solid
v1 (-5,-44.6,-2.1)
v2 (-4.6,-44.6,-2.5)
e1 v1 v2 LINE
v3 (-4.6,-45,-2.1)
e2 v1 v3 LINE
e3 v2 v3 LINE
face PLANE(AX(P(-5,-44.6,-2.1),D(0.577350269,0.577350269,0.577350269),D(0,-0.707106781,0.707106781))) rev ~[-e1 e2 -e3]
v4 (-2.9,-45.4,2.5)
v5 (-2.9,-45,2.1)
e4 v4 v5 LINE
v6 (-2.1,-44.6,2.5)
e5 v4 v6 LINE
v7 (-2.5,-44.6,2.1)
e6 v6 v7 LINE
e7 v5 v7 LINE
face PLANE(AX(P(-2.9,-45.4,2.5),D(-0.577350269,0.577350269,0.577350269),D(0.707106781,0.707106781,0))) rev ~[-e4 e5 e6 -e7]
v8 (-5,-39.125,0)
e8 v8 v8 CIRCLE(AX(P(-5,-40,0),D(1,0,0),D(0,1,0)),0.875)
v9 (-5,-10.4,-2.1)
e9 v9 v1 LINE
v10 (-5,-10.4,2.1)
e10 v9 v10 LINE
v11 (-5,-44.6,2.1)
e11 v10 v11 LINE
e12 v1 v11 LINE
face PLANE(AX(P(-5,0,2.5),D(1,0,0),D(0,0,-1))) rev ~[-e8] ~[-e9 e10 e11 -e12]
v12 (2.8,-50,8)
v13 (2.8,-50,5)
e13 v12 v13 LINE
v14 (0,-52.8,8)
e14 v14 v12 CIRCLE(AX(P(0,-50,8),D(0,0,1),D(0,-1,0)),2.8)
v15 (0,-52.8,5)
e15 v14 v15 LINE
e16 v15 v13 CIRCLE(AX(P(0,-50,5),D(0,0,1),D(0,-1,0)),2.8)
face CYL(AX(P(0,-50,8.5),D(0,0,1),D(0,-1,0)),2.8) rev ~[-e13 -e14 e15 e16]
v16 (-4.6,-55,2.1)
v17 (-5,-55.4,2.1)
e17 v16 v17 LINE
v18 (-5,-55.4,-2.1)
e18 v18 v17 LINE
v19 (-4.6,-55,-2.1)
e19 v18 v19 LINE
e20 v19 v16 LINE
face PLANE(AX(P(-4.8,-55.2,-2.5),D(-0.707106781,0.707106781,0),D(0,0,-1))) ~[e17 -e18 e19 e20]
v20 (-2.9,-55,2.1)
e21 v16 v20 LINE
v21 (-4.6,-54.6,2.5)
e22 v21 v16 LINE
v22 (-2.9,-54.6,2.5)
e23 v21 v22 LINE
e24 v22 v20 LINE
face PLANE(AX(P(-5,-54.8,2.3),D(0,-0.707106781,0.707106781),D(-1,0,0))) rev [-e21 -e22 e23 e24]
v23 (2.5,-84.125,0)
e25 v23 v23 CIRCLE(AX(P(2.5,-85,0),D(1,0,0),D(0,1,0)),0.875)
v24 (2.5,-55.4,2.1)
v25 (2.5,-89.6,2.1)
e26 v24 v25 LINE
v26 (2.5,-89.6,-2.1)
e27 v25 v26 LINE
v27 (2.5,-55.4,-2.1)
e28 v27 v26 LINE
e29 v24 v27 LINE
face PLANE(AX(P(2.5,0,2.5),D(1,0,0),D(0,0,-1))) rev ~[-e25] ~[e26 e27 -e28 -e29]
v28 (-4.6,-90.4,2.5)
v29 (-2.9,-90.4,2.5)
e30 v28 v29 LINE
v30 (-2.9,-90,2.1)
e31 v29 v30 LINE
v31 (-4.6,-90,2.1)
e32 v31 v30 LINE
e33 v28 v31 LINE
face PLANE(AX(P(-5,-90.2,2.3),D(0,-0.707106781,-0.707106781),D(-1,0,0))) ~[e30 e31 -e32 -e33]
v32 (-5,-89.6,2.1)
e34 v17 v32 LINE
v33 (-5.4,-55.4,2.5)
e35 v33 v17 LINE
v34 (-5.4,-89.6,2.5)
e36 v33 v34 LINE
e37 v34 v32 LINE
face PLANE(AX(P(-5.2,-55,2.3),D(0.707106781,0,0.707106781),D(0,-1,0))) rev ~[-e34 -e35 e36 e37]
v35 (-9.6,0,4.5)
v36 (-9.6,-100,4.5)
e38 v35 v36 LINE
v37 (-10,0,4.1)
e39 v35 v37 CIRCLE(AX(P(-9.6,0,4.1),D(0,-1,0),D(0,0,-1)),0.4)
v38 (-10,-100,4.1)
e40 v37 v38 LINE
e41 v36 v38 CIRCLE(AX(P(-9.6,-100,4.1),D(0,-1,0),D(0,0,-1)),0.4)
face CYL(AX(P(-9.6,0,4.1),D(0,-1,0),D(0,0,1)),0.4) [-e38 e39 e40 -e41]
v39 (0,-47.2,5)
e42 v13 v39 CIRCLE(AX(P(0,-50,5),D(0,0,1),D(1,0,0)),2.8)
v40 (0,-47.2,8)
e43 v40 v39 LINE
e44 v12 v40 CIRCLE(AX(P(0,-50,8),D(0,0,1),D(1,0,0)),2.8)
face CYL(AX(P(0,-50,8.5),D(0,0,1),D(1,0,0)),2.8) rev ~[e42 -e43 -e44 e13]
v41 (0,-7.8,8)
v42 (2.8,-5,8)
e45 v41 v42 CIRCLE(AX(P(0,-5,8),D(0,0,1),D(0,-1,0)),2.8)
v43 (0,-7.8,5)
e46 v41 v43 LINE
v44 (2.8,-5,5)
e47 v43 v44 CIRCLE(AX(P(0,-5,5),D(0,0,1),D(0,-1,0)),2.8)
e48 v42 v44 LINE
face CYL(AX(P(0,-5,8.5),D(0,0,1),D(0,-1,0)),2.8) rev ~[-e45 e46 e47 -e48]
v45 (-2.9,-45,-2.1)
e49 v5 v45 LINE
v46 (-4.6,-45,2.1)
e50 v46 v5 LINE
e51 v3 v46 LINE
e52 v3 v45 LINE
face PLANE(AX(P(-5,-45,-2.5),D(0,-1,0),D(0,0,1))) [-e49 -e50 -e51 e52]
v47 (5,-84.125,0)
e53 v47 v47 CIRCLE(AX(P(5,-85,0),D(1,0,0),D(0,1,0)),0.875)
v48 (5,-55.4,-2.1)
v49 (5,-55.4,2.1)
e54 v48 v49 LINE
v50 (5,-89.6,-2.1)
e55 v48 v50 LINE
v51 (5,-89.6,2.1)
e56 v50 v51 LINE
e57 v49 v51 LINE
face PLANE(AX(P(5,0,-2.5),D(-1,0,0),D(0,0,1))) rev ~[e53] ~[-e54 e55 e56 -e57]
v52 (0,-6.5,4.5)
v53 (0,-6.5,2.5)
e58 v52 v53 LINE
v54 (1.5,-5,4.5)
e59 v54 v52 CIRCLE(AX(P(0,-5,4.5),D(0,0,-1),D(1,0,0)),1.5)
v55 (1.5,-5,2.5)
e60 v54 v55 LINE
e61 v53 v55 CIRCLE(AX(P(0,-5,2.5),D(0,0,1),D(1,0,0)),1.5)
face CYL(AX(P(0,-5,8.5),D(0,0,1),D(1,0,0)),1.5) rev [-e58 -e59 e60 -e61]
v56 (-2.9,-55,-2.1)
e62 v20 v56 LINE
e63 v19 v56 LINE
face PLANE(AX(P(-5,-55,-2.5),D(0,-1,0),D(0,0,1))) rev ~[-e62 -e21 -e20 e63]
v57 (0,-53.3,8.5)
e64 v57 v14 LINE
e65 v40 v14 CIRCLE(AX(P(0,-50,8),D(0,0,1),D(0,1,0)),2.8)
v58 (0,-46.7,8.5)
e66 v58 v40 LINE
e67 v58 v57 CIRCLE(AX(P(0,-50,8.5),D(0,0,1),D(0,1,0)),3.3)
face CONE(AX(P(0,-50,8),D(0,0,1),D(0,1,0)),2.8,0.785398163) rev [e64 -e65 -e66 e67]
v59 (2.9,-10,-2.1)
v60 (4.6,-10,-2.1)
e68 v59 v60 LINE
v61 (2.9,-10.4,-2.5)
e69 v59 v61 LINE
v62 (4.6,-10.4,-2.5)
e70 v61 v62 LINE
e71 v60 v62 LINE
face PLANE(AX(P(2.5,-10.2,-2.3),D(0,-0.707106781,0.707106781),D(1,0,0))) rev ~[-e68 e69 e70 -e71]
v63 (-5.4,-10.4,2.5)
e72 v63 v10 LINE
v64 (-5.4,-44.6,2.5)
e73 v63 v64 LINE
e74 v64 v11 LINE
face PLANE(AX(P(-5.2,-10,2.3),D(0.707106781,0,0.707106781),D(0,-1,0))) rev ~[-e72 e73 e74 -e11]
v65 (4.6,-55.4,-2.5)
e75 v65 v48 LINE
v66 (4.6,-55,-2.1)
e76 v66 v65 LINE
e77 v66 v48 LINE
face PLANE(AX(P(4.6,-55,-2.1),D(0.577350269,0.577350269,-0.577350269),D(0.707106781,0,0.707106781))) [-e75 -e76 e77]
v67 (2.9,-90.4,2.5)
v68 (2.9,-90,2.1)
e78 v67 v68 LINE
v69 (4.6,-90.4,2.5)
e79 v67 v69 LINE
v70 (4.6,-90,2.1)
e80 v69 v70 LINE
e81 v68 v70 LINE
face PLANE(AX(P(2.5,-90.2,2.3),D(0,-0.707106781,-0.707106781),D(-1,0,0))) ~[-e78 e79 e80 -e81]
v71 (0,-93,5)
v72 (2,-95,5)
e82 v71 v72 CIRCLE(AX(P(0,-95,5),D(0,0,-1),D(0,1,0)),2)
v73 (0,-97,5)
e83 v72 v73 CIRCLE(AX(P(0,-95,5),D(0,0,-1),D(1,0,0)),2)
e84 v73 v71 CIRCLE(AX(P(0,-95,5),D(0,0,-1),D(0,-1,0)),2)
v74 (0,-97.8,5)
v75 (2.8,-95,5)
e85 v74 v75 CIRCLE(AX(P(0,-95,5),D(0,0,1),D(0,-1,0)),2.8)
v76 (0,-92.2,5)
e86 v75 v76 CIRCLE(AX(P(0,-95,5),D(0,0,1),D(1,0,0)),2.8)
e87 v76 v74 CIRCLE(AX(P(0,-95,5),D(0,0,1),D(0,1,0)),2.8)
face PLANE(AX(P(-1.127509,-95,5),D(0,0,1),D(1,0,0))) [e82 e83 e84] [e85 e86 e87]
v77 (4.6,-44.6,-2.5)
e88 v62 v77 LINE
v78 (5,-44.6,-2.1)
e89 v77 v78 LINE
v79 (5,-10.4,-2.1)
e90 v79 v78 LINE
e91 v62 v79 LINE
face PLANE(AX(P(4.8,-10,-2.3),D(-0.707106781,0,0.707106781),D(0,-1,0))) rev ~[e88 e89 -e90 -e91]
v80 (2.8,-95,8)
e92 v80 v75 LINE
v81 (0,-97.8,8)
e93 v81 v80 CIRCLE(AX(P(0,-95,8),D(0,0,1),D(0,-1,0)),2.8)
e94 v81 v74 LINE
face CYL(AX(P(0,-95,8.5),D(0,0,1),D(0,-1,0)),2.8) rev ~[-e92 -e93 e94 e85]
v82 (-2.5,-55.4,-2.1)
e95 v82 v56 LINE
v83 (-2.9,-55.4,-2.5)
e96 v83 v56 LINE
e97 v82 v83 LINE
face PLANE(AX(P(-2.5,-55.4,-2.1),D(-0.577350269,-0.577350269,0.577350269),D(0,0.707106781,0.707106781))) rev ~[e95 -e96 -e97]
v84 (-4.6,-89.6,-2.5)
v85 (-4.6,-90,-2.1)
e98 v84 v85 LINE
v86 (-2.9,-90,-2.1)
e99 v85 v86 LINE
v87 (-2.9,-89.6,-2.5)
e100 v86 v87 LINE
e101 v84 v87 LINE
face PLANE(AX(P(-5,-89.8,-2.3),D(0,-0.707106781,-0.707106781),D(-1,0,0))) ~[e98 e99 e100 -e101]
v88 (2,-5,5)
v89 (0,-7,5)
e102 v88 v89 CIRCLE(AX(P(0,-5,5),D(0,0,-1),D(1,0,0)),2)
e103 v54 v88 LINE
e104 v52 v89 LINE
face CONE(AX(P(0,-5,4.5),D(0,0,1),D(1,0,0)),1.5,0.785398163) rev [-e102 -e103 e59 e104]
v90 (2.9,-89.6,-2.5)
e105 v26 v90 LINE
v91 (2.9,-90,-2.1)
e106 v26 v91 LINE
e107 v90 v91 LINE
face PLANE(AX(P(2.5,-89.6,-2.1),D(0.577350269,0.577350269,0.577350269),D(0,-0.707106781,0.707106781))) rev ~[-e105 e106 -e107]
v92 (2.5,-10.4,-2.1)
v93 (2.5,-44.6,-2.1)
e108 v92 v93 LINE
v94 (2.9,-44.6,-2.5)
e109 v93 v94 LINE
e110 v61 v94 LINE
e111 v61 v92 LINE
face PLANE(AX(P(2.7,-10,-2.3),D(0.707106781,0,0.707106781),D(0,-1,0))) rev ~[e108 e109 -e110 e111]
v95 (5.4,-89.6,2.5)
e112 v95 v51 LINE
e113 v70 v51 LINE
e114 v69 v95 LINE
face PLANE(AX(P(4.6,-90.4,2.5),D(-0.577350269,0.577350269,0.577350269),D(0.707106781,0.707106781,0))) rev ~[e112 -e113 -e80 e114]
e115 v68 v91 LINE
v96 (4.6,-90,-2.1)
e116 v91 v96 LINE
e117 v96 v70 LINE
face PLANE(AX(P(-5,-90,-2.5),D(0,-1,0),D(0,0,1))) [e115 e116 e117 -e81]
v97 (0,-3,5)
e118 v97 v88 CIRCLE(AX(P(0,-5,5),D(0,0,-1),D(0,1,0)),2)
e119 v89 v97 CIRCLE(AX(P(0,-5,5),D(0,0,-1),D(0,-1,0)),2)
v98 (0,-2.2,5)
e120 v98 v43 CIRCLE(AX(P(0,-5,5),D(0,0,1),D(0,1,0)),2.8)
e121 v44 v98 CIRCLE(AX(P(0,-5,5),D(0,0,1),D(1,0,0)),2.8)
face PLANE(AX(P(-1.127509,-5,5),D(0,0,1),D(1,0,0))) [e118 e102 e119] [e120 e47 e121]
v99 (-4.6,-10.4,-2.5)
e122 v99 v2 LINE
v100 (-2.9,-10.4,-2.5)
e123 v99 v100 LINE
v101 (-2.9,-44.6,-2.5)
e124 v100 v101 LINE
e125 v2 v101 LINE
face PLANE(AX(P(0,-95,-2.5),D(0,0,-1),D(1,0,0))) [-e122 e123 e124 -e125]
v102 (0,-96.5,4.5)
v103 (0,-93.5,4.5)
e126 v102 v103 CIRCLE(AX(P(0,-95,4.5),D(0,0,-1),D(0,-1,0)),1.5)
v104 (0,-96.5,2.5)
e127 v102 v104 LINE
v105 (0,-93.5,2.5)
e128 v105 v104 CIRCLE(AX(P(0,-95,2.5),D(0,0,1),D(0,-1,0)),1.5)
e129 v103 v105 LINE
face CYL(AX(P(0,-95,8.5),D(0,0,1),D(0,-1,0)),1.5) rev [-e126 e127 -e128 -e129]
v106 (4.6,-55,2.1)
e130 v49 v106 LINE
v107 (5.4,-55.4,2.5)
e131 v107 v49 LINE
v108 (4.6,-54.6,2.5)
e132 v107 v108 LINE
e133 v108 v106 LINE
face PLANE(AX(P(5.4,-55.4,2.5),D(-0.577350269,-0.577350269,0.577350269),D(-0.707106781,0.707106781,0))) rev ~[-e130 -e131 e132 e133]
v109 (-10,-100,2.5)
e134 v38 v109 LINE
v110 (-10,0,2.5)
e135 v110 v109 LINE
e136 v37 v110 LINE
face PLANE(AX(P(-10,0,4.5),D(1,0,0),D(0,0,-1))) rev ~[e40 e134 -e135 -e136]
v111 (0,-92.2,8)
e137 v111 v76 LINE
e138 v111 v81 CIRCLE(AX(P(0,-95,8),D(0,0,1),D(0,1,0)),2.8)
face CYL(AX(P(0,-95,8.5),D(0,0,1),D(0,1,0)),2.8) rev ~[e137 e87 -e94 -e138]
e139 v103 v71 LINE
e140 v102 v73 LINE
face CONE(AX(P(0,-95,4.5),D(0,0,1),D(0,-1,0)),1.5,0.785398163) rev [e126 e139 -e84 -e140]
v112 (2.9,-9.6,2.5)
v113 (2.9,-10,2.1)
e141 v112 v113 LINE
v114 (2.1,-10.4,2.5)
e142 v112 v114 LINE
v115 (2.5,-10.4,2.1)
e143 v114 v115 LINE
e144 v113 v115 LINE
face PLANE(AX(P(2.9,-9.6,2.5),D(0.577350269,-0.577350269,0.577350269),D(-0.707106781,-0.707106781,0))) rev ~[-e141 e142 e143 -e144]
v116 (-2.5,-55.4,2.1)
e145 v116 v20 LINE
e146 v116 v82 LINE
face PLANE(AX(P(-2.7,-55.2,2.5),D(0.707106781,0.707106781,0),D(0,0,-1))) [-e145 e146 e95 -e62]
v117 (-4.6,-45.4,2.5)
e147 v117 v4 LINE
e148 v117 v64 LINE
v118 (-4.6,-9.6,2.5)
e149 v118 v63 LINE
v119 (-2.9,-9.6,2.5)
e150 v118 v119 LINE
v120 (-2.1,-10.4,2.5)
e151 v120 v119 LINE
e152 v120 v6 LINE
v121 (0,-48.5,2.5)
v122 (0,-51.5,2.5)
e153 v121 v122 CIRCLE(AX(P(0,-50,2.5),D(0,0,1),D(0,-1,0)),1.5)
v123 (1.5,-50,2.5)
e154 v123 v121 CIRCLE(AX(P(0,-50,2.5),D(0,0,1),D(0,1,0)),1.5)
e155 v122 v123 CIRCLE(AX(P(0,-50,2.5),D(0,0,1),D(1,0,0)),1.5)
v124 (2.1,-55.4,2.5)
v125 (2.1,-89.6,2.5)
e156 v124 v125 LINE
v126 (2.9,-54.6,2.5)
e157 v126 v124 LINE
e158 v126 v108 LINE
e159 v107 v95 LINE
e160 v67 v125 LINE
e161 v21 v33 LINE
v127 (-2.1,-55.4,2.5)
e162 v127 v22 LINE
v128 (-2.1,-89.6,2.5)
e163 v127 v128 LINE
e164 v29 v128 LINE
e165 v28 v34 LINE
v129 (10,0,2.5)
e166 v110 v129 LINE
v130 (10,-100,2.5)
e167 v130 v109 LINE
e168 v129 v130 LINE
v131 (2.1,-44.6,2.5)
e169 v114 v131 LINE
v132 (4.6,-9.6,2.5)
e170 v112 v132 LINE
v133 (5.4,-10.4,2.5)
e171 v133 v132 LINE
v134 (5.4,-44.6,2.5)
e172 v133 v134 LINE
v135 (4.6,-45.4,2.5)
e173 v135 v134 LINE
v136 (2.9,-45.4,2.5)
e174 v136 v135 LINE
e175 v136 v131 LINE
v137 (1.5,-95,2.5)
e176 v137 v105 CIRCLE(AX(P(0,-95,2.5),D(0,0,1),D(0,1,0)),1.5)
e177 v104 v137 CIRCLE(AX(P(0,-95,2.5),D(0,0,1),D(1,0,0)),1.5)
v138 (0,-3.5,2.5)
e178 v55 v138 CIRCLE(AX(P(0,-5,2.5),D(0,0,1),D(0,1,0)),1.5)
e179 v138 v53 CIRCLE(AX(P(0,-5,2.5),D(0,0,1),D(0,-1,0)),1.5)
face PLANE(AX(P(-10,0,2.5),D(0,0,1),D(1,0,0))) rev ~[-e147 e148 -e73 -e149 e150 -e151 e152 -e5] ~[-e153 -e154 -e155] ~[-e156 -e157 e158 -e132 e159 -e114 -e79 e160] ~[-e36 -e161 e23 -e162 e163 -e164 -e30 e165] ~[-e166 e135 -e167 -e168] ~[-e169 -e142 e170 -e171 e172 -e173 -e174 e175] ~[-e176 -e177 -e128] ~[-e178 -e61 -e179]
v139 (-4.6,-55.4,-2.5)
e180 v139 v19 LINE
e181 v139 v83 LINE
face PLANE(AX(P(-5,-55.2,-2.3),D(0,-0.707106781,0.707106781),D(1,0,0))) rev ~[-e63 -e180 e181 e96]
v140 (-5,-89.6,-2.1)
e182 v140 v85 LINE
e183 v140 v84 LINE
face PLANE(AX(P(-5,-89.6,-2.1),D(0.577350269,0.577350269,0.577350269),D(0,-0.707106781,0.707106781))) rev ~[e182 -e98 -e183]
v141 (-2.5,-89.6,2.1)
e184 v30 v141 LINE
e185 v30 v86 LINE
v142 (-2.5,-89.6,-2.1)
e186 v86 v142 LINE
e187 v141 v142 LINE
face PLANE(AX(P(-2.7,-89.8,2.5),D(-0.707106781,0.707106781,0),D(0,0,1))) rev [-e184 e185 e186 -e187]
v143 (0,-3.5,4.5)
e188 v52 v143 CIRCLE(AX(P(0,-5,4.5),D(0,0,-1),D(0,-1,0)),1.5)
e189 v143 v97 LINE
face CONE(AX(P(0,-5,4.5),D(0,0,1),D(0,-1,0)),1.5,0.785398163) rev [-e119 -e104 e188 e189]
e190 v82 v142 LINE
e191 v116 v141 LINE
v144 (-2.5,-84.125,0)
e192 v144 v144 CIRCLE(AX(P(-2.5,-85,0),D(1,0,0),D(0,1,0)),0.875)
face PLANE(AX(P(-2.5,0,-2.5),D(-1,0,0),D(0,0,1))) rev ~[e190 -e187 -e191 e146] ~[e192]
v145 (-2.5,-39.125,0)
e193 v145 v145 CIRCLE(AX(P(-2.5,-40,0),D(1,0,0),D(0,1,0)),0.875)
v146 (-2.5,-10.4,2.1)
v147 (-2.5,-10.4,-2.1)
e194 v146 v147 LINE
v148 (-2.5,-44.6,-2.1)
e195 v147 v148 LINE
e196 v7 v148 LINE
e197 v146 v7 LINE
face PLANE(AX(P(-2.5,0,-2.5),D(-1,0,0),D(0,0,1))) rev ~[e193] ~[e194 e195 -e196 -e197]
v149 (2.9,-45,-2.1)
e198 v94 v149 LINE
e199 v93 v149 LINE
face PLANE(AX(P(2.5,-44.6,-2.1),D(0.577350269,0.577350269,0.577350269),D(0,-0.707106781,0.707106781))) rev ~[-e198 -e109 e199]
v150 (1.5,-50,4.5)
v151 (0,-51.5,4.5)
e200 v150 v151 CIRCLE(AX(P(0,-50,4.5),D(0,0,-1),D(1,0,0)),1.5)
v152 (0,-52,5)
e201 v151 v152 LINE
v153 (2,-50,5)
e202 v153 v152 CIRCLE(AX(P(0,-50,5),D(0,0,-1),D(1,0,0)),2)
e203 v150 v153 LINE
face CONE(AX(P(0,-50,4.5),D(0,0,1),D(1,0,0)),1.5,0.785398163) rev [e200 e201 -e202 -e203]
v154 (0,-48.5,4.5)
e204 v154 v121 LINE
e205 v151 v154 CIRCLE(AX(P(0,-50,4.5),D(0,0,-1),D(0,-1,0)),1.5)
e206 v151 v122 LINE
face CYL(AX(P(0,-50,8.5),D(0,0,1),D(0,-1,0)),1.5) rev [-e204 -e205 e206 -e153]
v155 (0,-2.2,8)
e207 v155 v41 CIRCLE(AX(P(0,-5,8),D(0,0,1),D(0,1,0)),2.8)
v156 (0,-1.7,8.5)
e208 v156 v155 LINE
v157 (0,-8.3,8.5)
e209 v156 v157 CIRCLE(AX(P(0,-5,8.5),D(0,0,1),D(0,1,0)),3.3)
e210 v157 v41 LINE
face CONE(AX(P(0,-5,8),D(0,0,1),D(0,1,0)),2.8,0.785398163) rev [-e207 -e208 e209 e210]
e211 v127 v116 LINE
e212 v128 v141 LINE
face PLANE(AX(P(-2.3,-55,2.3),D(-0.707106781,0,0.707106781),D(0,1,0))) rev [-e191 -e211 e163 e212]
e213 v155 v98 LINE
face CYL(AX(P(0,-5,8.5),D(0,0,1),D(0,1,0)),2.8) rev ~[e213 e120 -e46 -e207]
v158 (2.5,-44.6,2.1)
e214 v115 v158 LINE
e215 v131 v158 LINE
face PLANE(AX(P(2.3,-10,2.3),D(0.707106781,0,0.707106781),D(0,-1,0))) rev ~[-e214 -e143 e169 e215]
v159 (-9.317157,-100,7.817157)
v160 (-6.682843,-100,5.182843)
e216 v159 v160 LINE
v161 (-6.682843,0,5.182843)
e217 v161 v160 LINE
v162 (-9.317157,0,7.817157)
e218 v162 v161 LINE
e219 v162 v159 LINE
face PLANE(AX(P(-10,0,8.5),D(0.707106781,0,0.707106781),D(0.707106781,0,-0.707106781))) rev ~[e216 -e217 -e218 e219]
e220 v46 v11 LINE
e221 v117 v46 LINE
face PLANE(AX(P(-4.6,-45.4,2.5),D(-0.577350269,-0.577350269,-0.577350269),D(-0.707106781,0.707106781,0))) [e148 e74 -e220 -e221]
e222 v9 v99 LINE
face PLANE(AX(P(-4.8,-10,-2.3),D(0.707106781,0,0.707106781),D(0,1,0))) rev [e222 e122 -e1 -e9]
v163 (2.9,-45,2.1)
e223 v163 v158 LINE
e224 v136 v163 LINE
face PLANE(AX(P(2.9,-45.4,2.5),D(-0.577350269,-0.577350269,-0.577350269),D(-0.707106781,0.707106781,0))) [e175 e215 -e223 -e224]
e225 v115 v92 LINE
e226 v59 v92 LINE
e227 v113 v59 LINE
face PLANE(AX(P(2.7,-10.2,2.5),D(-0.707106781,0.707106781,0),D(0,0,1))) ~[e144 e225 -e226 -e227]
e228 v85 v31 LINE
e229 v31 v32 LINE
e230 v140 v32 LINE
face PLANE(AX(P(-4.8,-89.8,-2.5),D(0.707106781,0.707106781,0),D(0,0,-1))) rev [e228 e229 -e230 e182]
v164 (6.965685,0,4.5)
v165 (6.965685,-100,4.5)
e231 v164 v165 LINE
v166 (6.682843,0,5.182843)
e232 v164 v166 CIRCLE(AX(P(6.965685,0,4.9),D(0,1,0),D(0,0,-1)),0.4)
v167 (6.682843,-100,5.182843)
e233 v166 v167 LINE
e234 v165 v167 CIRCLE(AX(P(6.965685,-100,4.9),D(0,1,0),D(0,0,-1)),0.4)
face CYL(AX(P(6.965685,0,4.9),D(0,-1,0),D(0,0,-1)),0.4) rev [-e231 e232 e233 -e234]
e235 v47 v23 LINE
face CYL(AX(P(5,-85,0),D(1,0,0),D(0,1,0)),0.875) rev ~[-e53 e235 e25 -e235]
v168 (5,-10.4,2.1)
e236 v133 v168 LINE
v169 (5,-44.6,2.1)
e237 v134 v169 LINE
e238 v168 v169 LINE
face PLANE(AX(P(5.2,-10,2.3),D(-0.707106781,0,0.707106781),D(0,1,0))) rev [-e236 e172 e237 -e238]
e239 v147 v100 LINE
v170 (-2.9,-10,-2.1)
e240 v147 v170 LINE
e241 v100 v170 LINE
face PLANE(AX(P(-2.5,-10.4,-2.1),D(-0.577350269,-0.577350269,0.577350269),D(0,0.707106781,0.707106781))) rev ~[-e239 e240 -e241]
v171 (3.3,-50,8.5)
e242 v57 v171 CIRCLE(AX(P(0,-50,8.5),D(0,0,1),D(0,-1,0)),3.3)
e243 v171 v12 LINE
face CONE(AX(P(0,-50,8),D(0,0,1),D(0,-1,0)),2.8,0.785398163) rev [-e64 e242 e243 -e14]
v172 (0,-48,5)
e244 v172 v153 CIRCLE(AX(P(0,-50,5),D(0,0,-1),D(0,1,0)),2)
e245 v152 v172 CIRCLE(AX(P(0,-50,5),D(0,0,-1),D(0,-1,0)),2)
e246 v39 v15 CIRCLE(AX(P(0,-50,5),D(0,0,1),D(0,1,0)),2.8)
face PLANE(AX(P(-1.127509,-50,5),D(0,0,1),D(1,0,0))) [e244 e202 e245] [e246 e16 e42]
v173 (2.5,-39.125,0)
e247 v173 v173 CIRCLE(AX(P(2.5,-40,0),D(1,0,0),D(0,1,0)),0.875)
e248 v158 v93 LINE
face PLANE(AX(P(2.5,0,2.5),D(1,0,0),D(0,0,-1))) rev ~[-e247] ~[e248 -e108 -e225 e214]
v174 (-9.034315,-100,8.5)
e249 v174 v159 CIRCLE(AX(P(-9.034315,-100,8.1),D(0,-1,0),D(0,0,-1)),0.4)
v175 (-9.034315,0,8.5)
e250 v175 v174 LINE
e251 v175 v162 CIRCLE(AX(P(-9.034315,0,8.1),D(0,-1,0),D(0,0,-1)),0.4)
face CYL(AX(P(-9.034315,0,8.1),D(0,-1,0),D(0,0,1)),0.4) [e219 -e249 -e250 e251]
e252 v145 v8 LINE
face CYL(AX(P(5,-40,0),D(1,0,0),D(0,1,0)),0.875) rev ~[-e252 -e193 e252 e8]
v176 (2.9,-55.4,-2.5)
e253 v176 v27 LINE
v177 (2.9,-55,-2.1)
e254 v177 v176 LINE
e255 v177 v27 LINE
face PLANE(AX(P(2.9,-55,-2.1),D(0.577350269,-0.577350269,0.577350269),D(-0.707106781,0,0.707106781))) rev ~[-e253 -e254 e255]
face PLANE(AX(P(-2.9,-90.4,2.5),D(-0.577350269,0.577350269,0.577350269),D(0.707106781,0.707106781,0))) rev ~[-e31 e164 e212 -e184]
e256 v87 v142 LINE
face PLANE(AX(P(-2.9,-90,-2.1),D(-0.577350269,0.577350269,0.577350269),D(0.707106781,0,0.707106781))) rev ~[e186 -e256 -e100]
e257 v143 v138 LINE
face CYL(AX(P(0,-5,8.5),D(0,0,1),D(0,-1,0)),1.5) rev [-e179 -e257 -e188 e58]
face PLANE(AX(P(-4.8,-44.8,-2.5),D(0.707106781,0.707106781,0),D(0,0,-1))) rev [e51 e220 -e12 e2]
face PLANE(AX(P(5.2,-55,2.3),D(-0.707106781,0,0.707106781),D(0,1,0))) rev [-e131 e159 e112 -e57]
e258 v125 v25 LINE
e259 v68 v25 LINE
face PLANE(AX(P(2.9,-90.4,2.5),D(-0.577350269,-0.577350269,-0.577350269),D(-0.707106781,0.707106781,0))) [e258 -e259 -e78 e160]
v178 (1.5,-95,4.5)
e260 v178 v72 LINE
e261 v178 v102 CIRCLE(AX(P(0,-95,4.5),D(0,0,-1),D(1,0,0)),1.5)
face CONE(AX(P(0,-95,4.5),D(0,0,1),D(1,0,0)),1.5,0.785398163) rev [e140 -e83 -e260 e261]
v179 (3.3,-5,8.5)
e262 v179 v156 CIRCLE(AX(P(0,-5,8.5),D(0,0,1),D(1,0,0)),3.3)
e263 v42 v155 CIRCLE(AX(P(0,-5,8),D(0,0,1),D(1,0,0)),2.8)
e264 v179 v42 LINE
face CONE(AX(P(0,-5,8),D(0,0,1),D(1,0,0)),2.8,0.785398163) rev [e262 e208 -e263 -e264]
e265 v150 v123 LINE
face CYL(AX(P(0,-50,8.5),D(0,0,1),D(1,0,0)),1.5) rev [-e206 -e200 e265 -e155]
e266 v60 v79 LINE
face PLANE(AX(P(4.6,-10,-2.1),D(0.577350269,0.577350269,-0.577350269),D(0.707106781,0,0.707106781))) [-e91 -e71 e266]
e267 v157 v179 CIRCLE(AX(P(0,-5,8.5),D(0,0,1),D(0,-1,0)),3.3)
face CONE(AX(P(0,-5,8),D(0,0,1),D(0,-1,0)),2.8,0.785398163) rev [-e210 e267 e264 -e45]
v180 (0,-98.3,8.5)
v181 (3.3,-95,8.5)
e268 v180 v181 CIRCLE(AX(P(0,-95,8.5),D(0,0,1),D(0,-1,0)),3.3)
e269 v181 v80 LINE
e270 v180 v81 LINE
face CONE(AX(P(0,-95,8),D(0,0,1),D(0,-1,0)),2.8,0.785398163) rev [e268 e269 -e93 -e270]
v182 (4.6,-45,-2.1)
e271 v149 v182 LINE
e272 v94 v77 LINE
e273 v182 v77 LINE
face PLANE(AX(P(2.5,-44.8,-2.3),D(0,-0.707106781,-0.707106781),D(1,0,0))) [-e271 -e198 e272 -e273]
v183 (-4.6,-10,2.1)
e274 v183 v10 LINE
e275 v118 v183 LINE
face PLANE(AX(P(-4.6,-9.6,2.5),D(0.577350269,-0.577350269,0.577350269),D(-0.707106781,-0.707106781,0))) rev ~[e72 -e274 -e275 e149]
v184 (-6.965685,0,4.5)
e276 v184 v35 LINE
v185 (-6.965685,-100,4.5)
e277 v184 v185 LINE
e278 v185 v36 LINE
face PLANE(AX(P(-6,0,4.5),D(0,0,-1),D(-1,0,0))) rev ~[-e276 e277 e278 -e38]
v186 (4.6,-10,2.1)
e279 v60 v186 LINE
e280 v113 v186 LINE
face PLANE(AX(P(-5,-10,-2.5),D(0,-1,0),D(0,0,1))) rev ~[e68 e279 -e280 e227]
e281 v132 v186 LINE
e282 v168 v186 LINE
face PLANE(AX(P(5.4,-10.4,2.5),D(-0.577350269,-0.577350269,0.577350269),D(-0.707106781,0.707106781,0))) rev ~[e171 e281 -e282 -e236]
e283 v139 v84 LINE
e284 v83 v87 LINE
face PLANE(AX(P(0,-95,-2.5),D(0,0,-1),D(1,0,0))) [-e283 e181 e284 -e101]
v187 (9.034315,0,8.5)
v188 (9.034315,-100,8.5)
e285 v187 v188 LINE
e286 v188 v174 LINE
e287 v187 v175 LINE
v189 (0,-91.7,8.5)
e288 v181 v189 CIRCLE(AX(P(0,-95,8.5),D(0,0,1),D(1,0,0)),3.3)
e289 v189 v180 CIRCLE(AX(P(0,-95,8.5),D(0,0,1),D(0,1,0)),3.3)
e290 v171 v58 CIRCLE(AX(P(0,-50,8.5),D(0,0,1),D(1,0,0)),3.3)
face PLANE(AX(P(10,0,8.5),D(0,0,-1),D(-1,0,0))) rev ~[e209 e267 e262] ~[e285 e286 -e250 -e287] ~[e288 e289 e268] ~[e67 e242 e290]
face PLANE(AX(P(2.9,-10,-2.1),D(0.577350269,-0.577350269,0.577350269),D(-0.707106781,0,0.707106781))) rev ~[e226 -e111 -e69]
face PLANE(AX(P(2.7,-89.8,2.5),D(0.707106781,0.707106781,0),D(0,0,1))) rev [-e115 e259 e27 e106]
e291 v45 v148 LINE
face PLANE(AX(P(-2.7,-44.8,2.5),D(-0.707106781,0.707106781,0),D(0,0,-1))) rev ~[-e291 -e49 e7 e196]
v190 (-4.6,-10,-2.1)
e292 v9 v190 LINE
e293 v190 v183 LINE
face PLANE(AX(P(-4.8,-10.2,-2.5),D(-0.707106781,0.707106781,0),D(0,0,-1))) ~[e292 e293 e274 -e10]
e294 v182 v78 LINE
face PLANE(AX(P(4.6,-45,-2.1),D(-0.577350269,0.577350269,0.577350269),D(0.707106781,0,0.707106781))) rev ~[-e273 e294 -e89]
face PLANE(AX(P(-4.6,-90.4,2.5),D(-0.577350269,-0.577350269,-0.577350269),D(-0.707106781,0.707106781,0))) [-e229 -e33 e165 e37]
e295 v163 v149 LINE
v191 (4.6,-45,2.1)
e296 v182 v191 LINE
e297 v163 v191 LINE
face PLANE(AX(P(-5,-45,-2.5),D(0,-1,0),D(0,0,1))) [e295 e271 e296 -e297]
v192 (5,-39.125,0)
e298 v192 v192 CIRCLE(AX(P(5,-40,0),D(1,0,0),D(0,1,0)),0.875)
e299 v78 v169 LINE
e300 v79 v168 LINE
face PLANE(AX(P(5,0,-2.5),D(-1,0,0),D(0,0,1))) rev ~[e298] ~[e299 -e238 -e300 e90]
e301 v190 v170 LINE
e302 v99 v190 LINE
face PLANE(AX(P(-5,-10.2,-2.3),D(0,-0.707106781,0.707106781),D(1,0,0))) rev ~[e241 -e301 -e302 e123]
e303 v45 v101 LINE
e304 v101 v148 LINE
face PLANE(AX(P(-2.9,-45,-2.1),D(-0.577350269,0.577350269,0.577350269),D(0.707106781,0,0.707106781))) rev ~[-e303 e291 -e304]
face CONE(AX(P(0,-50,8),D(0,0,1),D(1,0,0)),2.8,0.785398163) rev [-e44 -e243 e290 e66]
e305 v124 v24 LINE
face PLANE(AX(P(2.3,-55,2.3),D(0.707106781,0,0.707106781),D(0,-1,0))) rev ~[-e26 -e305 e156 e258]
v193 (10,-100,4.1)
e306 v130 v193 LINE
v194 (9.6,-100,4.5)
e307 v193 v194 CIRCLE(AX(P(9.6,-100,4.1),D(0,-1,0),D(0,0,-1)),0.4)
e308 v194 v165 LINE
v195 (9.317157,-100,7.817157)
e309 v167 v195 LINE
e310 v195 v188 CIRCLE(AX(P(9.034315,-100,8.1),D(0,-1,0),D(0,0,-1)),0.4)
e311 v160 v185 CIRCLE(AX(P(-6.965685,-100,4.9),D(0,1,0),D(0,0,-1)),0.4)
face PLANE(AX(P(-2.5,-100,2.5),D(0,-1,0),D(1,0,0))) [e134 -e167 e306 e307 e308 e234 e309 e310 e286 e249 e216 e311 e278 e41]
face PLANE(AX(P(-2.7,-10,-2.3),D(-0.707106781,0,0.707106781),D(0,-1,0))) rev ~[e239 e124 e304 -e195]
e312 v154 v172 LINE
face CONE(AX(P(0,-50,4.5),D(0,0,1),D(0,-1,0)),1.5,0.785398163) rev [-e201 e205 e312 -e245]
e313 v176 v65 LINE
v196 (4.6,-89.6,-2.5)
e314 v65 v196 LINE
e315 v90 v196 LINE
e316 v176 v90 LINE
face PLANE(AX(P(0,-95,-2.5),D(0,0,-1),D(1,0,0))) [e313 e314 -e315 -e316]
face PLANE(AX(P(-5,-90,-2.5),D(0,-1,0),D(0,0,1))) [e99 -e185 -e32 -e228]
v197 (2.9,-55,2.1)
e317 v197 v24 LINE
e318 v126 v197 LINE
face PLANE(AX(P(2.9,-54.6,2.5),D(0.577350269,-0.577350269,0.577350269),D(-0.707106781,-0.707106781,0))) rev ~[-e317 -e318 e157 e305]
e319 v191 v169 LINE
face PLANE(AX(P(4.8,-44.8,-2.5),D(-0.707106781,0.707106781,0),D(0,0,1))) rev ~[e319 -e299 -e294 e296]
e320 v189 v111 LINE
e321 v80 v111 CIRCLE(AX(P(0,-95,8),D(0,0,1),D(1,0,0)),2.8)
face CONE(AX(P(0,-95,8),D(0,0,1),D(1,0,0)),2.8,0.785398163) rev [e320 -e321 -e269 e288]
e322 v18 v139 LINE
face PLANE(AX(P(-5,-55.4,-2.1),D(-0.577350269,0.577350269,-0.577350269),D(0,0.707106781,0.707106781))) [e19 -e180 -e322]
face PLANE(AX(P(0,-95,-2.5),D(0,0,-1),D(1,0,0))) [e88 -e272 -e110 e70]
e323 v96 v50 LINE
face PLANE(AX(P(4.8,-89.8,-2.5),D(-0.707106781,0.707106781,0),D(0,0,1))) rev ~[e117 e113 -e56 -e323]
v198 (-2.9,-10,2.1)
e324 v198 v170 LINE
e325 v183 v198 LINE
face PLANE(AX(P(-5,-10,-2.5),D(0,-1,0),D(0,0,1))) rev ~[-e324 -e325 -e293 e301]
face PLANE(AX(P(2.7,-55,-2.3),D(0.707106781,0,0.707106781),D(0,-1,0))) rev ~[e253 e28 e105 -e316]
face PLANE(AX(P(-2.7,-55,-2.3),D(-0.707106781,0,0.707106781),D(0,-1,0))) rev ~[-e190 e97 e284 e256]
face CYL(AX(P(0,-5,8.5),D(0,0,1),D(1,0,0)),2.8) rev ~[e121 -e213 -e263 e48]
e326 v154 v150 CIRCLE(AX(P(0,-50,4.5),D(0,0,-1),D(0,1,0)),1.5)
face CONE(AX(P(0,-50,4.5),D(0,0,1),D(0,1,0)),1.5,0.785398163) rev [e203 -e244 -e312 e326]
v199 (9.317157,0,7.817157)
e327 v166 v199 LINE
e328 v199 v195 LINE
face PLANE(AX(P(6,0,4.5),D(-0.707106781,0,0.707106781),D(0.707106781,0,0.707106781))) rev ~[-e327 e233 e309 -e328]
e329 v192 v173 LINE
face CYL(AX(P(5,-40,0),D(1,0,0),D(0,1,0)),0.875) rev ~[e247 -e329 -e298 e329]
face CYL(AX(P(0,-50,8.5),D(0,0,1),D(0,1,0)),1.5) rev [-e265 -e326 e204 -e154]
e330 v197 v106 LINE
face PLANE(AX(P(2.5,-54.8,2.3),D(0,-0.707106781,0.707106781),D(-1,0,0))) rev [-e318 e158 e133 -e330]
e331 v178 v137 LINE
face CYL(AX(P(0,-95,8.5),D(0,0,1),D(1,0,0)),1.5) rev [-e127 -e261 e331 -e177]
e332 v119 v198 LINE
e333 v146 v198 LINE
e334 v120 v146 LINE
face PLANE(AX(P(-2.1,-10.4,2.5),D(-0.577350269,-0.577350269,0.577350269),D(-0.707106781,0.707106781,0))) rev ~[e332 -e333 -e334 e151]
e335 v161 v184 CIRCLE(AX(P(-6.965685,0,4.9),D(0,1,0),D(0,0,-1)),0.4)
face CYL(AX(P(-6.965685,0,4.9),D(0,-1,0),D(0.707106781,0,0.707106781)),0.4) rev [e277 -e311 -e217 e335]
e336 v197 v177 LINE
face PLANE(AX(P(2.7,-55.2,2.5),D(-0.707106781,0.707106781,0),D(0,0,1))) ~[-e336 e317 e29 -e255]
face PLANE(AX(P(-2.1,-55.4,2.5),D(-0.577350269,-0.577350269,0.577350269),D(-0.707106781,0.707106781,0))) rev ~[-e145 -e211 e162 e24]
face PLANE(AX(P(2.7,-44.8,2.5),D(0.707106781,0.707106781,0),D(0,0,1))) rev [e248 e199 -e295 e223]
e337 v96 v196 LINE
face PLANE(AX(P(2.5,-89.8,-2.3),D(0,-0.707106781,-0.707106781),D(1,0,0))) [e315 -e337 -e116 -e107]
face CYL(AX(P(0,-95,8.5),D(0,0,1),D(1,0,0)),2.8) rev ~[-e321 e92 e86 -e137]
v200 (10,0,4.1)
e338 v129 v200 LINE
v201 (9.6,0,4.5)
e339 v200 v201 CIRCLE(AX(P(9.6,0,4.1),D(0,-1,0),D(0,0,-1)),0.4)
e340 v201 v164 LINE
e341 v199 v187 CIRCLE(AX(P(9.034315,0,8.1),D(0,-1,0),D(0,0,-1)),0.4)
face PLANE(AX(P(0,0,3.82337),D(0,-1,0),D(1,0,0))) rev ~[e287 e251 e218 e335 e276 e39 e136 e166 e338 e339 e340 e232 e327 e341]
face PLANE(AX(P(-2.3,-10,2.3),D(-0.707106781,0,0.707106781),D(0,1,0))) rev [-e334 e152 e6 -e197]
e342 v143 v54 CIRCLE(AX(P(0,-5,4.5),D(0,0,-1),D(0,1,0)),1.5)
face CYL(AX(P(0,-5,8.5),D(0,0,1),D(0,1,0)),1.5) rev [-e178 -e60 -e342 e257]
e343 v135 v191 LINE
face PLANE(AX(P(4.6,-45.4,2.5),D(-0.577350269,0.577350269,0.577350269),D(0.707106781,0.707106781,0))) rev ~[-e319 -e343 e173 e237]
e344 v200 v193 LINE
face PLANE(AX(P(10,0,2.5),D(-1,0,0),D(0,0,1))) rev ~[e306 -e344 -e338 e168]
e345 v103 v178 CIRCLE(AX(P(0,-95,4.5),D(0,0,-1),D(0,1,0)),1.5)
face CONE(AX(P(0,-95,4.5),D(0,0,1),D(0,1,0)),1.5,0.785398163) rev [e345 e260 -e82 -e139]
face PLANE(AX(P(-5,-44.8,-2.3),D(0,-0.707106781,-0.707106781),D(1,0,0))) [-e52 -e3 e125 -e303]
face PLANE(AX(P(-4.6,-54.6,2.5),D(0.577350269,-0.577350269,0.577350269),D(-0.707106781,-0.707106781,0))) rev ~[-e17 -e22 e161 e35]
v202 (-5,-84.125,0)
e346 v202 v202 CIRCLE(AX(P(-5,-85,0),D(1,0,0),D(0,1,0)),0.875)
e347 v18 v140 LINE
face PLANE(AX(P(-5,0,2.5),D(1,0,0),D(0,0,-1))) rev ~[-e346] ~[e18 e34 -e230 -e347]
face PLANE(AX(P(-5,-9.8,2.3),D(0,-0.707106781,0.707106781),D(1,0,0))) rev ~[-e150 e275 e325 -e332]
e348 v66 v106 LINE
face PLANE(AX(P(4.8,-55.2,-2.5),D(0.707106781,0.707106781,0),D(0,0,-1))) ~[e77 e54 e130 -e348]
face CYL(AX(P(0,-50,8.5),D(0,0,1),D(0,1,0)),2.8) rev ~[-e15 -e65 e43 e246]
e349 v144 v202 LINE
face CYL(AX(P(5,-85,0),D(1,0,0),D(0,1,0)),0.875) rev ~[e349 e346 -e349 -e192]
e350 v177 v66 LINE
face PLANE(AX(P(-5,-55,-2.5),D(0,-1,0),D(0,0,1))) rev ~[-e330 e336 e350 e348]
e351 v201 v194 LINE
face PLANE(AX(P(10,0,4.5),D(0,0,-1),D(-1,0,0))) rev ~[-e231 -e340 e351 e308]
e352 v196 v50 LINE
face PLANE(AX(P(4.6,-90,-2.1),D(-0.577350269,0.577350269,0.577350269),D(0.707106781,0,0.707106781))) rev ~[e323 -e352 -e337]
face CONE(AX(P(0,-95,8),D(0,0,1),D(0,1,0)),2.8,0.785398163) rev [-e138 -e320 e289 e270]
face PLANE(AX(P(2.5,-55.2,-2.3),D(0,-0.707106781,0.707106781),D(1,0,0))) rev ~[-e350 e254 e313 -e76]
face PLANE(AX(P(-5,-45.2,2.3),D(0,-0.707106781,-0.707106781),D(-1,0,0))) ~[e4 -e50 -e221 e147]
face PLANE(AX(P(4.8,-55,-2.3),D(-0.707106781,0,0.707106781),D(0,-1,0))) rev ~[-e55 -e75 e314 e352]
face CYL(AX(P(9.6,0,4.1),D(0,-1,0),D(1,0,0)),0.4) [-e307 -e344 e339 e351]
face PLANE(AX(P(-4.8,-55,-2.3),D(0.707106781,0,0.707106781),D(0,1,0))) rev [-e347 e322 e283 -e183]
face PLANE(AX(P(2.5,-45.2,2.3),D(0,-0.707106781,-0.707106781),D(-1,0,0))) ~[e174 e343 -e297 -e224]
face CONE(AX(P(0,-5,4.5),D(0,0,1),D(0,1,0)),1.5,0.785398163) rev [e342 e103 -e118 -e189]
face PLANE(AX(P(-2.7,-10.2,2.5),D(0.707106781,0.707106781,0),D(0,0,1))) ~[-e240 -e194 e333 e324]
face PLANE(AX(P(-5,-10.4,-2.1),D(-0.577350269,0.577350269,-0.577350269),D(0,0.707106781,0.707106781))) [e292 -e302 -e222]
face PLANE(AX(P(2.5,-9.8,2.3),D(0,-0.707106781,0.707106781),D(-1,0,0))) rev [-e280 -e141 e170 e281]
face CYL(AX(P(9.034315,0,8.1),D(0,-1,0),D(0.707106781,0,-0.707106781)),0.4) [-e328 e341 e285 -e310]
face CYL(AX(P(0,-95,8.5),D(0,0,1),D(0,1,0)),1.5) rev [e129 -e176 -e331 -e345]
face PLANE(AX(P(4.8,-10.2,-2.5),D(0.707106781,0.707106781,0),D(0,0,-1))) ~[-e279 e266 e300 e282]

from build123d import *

# Parameters (mm, degrees)
F1_DEPTH  = 100
F2_W      = 5
F2_H      = 10
F3_DEPTH  = 5
F4_R      = 0.875
F5_DEPTH  = 25
F6_R      = 0.4
F8_DEPTH  = 3.5
F9_DEPTH  = 11.001
F10_SIZE  = 0.5
F11_W     = 10
F11_H     = 5
F12_DEPTH = 25
F13_SIZE  = 0.4


with BuildPart() as f1:
    # F0 (on Front) → F1 (new body)
    with BuildSketch(Plane.XZ):
        Polygon((2.5, -2.5), (5, -2.5), (5, 2.5), (10, 2.5), (10, 4.5), (6, 4.5), (10, 8.5), (6, 8.5), (-6, 8.5), (-10, 8.5), (-6, 4.5), (-10, 4.5), (-10, 2.5), (-5, 2.5), (-5, -2.5), (-2.5, -2.5), (-2.5, 2.5), (2.5, 2.5), align=None)
    extrude(amount=F1_DEPTH)

    # F2 (on face) → F3 (join)
    with BuildSketch(Plane(origin=(0, 0, 2.5), x_dir=(1, 0, 0), z_dir=(0, 0, -1))):
        with Locations((0, 95)):
            Rectangle(F2_W, F2_H)
        Polygon((-2.5, 50), (-2.5, 45), (2.5, 45), (2.5, 50), (2.5, 55), (-2.5, 55), align=None)
        with Locations((0, 5)):
            Rectangle(F2_W, F2_H)
    extrude(amount=F3_DEPTH)

    # F4 (on face) → F5 (cut)
    with BuildSketch(Plane.YZ.offset(5)):
        with Locations((-85, 0)):
            Circle(F4_R)
        with Locations((-40, 0)):
            Circle(F4_R)
    extrude(amount=-F5_DEPTH, mode=Mode.SUBTRACT)

    # F6
    f6_edges = [f1.edges().sort_by_distance(p)[0] for p in [
        (10, -50, 4.5),
        (-10, -50, 4.5),
        (-6, -50, 4.5),
        (6, -50, 4.5),
        (10, -50, 8.5),
        (-10, -50, 8.5),
    ]]
    fillet(f6_edges, radius=F6_R)

    # F7 (on face) → F8 (cut)
    with BuildSketch(Plane.XY.offset(8.5)):
        with BuildLine():
            ThreePointArc((0, -92.2), (-2.8, -95), (0, -97.8))
            Line((0, -97.8), (0, -96.5))
            ThreePointArc((0, -96.5), (-1.5, -95), (0, -93.5))
            Line((0, -93.5), (0, -92.2))
        make_face()
        with BuildLine():
            ThreePointArc((0, -2.2), (-2.8, -5), (0, -7.8))
            Line((0, -7.8), (0, -6.5))
            ThreePointArc((0, -6.5), (-1.5, -5), (0, -3.5))
            Line((0, -3.5), (0, -2.2))
        make_face()
        with BuildLine():
            Line((0, -6.5), (0, -7.8))
            ThreePointArc((0, -7.8), (1.9798989873, -6.9798989873), (2.8, -5))
            ThreePointArc((2.8, -5), (1.9798989873, -3.0201010127), (0, -2.2))
            Line((0, -2.2), (0, -3.5))
            ThreePointArc((0, -3.5), (1.0606601718, -3.9393398282), (1.5, -5))
            ThreePointArc((1.5, -5), (1.0606601718, -6.0606601718), (0, -6.5))
        make_face()
        with BuildLine():
            ThreePointArc((0, -47.2), (-2.8, -50), (0, -52.8))
            Line((0, -52.8), (0, -51.5))
            ThreePointArc((0, -51.5), (-1.5, -50), (0, -48.5))
            Line((0, -48.5), (0, -47.2))
        make_face()
        with BuildLine():
            Line((0, -51.5), (0, -52.8))
            ThreePointArc((0, -52.8), (1.9798989873, -51.9798989873), (2.8, -50))
            ThreePointArc((2.8, -50), (1.9798989873, -48.0201010127), (0, -47.2))
            Line((0, -47.2), (0, -48.5))
            ThreePointArc((0, -48.5), (1.0606601718, -48.9393398282), (1.5, -50))
            ThreePointArc((1.5, -50), (1.0606601718, -51.0606601718), (0, -51.5))
        make_face()
        with BuildLine():
            Line((0, -96.5), (0, -97.8))
            ThreePointArc((0, -97.8), (1.9798989873, -96.9798989873), (2.8, -95))
            ThreePointArc((2.8, -95), (1.9798989873, -93.0201010127), (0, -92.2))
            Line((0, -92.2), (0, -93.5))
            ThreePointArc((0, -93.5), (1.0606601718, -93.9393398282), (1.5, -95))
            ThreePointArc((1.5, -95), (1.0606601718, -96.0606601718), (0, -96.5))
        make_face()
    extrude(amount=-F8_DEPTH, mode=Mode.SUBTRACT)

    # F9 (cut, through all): faces of the model
    f9_faces = [f1.faces().sort_by_distance(p)[0] for p in [
        (0, -5, 8.5),
        (0, -50, 8.5),
        (0, -95, 8.5),
    ]]
    extrude(f9_faces, amount=-F9_DEPTH, mode=Mode.SUBTRACT)

    # F10
    f10_edges = [f1.edges().sort_by_distance(p)[0] for p in [
        (0, -2.2, 8.5),
        (0, -47.2, 8.5),
        (0, -92.2, 8.5),
        (0, -6.5, 5),
        (0, -51.5, 5),
        (0, -96.5, 5),
        (0, -96.5, -2.5),
        (0, -51.5, -2.5),
        (0, -6.5, -2.5),
    ]]
    chamfer(f10_edges, length=F10_SIZE)

    # F11 (on face) → F12 (cut)
    with BuildSketch(Plane(origin=(-5, 0, 0), x_dir=(0, -1, 0), z_dir=(-1, 0, 0))):
        with Locations((5, 0)):
            Rectangle(F11_W, F11_H)
        with Locations((50, 0)):
            Rectangle(F11_W, F11_H)
        with Locations((95, 0)):
            Rectangle(F11_W, F11_H)
    extrude(amount=-F12_DEPTH, mode=Mode.SUBTRACT)

    # F13
    f13_edges = [f1.edges().sort_by_distance(p)[0] for p in [
        (5, -72.5, -2.5),
        (3.75, -90, -2.5),
        (2.5, -72.5, -2.5),
        (3.75, -55, -2.5),
        (-3.75, -55, -2.5),
        (-2.5, -72.5, -2.5),
        (-3.75, -90, -2.5),
        (-5, -72.5, -2.5),
        (-3.75, -10, -2.5),
        (-2.5, -27.5, -2.5),
        (-3.75, -45, -2.5),
        (-5, -27.5, -2.5),
        (5, -27.5, -2.5),
        (3.75, -45, -2.5),
        (2.5, -27.5, -2.5),
        (3.75, -10, -2.5),
        (2.5, -90, 0),
        (5, -90, 0),
        (3.75, -90, 2.5),
        (-5, -90, 0),
        (-2.5, -90, 0),
        (-3.75, -90, 2.5),
        (2.5, -45, 0),
        (5, -45, 0),
        (3.75, -45, 2.5),
        (-5, -45, 0),
        (-2.5, -45, 0),
        (-3.75, -45, 2.5),
        (2.5, -55, 0),
        (3.75, -55, 2.5),
        (5, -55, 0),
        (-5, -55, 0),
        (-3.75, -55, 2.5),
        (-2.5, -55, 0),
        (-5, -10, 0),
        (-3.75, -10, 2.5),
        (-2.5, -10, 0),
        (2.5, -10, 0),
        (3.75, -10, 2.5),
        (5, -10, 0),
        (5, -27.5, 2.5),
        (2.5, -27.5, 2.5),
        (-2.5, -27.5, 2.5),
        (-5, -27.5, 2.5),
        (5, -72.5, 2.5),
        (2.5, -72.5, 2.5),
        (-2.5, -72.5, 2.5),
        (-5, -72.5, 2.5),
    ]]
    chamfer(f13_edges, length=F13_SIZE)


solid = f1.part
